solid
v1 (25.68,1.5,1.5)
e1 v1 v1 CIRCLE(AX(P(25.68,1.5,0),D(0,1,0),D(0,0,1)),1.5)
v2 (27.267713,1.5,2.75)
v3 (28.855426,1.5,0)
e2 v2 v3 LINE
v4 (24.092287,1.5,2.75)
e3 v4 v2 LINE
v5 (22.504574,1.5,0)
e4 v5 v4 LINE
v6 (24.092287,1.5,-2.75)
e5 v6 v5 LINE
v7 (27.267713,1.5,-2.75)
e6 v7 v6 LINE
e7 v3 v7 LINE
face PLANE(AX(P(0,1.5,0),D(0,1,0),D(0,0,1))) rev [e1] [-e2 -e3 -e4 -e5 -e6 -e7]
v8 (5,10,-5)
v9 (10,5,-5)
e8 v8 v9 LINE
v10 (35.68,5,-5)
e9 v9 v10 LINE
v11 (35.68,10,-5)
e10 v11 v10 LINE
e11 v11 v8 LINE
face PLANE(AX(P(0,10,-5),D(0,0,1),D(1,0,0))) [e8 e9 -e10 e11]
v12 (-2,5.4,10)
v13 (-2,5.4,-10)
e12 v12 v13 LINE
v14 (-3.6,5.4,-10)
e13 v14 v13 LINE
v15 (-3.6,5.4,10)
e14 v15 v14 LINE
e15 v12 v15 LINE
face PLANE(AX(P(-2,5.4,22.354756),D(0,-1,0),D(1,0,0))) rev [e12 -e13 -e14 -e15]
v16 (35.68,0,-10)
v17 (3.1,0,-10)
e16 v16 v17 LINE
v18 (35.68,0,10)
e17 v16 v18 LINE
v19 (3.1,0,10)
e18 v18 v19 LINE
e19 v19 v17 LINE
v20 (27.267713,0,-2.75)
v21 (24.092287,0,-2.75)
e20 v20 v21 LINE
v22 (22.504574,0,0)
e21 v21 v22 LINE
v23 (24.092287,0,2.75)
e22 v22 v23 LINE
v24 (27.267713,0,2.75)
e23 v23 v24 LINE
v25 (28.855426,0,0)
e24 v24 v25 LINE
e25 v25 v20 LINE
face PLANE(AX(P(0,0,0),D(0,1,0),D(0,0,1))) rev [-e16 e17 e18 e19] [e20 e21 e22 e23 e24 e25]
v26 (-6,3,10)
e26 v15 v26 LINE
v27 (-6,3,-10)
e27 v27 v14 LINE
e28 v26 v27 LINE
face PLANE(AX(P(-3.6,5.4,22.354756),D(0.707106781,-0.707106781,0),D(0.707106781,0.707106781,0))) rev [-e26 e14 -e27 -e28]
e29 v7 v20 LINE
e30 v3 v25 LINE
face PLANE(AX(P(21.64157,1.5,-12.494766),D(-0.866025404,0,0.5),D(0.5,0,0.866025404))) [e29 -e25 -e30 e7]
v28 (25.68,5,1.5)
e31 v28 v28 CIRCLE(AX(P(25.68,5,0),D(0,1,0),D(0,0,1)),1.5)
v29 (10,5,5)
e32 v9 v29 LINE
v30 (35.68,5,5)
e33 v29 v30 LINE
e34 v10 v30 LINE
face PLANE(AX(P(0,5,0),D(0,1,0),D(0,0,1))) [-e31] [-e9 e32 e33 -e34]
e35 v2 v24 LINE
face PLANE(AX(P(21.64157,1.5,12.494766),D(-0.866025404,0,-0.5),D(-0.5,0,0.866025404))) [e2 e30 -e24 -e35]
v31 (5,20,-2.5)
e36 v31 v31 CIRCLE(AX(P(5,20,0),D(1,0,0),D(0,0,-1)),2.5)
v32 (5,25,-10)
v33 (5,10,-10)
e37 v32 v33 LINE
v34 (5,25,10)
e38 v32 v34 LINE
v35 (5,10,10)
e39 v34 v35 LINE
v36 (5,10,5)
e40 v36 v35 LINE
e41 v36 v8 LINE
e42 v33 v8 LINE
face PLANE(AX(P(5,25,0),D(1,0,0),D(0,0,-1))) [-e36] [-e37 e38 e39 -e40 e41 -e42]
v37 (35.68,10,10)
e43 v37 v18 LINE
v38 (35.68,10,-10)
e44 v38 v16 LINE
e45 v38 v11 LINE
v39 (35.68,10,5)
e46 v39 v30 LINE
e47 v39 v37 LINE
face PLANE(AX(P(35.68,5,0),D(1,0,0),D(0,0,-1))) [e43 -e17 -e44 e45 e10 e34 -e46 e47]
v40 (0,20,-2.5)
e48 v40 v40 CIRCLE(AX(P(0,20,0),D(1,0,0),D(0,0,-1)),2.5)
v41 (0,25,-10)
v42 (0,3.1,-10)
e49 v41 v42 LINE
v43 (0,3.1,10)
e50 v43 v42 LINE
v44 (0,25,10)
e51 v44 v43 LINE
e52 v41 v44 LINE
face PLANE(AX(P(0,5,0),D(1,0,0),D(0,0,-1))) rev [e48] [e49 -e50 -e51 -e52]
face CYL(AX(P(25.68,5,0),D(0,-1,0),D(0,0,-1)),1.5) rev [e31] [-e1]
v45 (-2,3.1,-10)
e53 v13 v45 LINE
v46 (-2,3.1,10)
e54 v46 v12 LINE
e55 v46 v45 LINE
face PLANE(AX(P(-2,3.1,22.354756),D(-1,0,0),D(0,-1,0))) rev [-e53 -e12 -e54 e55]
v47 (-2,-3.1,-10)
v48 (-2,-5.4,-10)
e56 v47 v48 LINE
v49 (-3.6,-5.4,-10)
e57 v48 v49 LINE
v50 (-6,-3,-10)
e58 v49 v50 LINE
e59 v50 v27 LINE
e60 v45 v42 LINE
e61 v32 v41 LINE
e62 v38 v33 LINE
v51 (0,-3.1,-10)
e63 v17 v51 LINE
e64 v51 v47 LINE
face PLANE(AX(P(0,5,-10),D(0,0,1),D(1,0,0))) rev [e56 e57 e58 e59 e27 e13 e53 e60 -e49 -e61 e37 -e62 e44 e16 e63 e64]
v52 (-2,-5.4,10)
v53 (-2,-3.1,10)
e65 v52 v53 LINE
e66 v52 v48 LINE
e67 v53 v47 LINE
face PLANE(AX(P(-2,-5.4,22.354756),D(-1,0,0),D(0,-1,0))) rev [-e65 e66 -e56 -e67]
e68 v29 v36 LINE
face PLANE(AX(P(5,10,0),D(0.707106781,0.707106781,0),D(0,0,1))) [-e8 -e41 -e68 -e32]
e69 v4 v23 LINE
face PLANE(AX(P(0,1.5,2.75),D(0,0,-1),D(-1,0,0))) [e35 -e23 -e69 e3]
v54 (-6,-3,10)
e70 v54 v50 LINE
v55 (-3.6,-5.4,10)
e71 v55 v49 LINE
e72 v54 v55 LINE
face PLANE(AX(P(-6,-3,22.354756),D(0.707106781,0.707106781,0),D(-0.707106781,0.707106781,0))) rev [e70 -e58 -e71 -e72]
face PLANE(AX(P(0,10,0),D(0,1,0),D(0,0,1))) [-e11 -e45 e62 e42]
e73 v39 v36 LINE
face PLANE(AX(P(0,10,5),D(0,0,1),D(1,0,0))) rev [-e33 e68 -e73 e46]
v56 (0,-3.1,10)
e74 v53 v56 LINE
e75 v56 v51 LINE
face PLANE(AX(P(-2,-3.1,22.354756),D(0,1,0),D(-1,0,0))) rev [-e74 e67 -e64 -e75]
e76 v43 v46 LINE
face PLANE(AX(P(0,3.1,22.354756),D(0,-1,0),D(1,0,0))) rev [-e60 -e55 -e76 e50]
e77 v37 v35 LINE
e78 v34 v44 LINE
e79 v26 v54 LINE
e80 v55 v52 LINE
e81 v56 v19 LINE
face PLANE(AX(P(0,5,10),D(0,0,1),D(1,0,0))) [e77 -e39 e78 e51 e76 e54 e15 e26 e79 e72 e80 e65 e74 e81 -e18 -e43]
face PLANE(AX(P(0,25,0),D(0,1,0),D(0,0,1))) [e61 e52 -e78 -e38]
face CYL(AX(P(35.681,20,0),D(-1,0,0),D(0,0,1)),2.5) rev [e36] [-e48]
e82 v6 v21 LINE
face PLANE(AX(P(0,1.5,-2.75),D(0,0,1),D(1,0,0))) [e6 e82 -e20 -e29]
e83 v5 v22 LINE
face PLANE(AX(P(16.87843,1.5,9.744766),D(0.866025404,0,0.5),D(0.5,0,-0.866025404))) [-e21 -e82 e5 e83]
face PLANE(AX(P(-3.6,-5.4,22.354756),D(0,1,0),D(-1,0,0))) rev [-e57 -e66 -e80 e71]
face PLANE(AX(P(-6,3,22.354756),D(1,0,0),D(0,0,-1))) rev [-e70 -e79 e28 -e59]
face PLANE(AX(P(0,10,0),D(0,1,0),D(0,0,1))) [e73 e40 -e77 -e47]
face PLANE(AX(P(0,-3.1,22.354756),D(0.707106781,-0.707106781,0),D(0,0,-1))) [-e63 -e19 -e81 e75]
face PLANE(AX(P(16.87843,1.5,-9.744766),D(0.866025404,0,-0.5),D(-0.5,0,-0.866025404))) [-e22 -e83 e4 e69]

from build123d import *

# Parameters (mm, degrees)
SKETCH_1_W          = 35.68
SKETCH_1_H          = 20
SKETCH_1_R          = 1.5
EXTRUDE_1_DEPTH     = 5
EXTRUDE_2_DEPTH     = 10
SKETCH_1_5_R        = 1.5
CUT_EXTRUDE_1_DEPTH = 1.5
EXTRUDE_4_DEPTH     = 25
CUT_EXTRUDE_3_REACH = 46.7
SKETCH_3_R          = 2.5
EXTRUDE_START       = -10
EXTRUDE_3_DEPTH     = 20
CHAMFER_1_SIZE      = 3.1
CHAMFER_2_SIZE      = 5


with BuildPart() as part:
    # 草图1 → 凸台-拉伸1 (new body)
    with BuildSketch(Plane(origin=(0, 0, 0), x_dir=(1, 0, 0), z_dir=(0, 1, 0))):
        with Locations((17.84, 0)):
            Rectangle(SKETCH_1_W, SKETCH_1_H)
        with Locations(Location((25.68, 0, 0), (0, 0, 270))):
            Circle(SKETCH_1_R, mode=Mode.SUBTRACT)
    extrude(amount=EXTRUDE_1_DEPTH)

    # 草图1<4> → 凸台-拉伸2 (add)
    with BuildSketch(Plane(origin=(0, 0, 0), x_dir=(1, 0, 0), z_dir=(0, 1, 0))):
        Polygon((25.68, 5), (35.68, 5), (35.68, 10), (5, 10), (5, 5), align=None)
        Polygon((35.68, -10), (35.68, -5), (25.68, -5), (5, -5), (5, -10), align=None)
    extrude(amount=EXTRUDE_2_DEPTH)

    # 草图1<5> → 切除-拉伸1 (cut)
    with BuildSketch(Plane(origin=(0, 0, 0), x_dir=(1, 0, 0), z_dir=(0, 1, 0))):
        Polygon((24.09228676, -2.75), (27.26771324, -2.75), (28.855426481, 0), (27.26771324, 2.75), (24.09228676, 2.75), (22.504573519, 0), align=None)
        with Locations(Location((25.68, 0, 0), (0, 0, 270))):
            Circle(SKETCH_1_5_R, mode=Mode.SUBTRACT)
    extrude(amount=CUT_EXTRUDE_1_DEPTH, mode=Mode.SUBTRACT)

    # 草图1<6> → 凸台-拉伸4 (add)
    with BuildSketch(Plane(origin=(0, 0, 0), x_dir=(1, 0, 0), z_dir=(0, 1, 0))):
        Polygon((5, -5), (5, 5), (5, 10), (0, 10), (0, -10), (5, -10), align=None)
    extrude(amount=EXTRUDE_4_DEPTH)

    # 草图3 → 切除-拉伸3 (cut, up to next)
    with BuildSketch(Plane(origin=(0, 0, 0), x_dir=(0, 0, -1), z_dir=(1, 0, 0)), mode=Mode.PRIVATE) as cut_extrude_3_sk1:
        with Locations((0, 20)):
            Circle(SKETCH_3_R)
    cut_extrude_3_tool1 = extrude(cut_extrude_3_sk1.sketch, amount=CUT_EXTRUDE_3_REACH, mode=Mode.PRIVATE) & part.part
    add(cut_extrude_3_tool1.solids().sort_by_distance((0, 20, 0))[0], mode=Mode.SUBTRACT)

    # 草图2 → 凸台-拉伸3 (add)
    with BuildSketch(Plane.XY.offset(EXTRUDE_START)):
        Polygon((0, 3.1), (-2, 3.1), (-2, 5.4), (-3.6, 5.4), (-6, 3), (-6, -3), (-3.6, -5.4), (-2, -5.4), (-2, -3.1), (0, -3.1), align=None)
    extrude(amount=EXTRUDE_3_DEPTH)

    # 倒角1
    chamfer_1_edges = [part.edges().sort_by_distance(p)[0] for p in [
        (0, 0, 0),
    ]]
    chamfer(chamfer_1_edges, length=CHAMFER_1_SIZE - 0.0001)  # a hair under: the kernel refuses the full size

    # 倒角2
    chamfer_2_edges = [part.edges().sort_by_distance(p)[0] for p in [
        (5, 5, 0),
    ]]
    chamfer(chamfer_2_edges, length=CHAMFER_2_SIZE)


solid = part.part
